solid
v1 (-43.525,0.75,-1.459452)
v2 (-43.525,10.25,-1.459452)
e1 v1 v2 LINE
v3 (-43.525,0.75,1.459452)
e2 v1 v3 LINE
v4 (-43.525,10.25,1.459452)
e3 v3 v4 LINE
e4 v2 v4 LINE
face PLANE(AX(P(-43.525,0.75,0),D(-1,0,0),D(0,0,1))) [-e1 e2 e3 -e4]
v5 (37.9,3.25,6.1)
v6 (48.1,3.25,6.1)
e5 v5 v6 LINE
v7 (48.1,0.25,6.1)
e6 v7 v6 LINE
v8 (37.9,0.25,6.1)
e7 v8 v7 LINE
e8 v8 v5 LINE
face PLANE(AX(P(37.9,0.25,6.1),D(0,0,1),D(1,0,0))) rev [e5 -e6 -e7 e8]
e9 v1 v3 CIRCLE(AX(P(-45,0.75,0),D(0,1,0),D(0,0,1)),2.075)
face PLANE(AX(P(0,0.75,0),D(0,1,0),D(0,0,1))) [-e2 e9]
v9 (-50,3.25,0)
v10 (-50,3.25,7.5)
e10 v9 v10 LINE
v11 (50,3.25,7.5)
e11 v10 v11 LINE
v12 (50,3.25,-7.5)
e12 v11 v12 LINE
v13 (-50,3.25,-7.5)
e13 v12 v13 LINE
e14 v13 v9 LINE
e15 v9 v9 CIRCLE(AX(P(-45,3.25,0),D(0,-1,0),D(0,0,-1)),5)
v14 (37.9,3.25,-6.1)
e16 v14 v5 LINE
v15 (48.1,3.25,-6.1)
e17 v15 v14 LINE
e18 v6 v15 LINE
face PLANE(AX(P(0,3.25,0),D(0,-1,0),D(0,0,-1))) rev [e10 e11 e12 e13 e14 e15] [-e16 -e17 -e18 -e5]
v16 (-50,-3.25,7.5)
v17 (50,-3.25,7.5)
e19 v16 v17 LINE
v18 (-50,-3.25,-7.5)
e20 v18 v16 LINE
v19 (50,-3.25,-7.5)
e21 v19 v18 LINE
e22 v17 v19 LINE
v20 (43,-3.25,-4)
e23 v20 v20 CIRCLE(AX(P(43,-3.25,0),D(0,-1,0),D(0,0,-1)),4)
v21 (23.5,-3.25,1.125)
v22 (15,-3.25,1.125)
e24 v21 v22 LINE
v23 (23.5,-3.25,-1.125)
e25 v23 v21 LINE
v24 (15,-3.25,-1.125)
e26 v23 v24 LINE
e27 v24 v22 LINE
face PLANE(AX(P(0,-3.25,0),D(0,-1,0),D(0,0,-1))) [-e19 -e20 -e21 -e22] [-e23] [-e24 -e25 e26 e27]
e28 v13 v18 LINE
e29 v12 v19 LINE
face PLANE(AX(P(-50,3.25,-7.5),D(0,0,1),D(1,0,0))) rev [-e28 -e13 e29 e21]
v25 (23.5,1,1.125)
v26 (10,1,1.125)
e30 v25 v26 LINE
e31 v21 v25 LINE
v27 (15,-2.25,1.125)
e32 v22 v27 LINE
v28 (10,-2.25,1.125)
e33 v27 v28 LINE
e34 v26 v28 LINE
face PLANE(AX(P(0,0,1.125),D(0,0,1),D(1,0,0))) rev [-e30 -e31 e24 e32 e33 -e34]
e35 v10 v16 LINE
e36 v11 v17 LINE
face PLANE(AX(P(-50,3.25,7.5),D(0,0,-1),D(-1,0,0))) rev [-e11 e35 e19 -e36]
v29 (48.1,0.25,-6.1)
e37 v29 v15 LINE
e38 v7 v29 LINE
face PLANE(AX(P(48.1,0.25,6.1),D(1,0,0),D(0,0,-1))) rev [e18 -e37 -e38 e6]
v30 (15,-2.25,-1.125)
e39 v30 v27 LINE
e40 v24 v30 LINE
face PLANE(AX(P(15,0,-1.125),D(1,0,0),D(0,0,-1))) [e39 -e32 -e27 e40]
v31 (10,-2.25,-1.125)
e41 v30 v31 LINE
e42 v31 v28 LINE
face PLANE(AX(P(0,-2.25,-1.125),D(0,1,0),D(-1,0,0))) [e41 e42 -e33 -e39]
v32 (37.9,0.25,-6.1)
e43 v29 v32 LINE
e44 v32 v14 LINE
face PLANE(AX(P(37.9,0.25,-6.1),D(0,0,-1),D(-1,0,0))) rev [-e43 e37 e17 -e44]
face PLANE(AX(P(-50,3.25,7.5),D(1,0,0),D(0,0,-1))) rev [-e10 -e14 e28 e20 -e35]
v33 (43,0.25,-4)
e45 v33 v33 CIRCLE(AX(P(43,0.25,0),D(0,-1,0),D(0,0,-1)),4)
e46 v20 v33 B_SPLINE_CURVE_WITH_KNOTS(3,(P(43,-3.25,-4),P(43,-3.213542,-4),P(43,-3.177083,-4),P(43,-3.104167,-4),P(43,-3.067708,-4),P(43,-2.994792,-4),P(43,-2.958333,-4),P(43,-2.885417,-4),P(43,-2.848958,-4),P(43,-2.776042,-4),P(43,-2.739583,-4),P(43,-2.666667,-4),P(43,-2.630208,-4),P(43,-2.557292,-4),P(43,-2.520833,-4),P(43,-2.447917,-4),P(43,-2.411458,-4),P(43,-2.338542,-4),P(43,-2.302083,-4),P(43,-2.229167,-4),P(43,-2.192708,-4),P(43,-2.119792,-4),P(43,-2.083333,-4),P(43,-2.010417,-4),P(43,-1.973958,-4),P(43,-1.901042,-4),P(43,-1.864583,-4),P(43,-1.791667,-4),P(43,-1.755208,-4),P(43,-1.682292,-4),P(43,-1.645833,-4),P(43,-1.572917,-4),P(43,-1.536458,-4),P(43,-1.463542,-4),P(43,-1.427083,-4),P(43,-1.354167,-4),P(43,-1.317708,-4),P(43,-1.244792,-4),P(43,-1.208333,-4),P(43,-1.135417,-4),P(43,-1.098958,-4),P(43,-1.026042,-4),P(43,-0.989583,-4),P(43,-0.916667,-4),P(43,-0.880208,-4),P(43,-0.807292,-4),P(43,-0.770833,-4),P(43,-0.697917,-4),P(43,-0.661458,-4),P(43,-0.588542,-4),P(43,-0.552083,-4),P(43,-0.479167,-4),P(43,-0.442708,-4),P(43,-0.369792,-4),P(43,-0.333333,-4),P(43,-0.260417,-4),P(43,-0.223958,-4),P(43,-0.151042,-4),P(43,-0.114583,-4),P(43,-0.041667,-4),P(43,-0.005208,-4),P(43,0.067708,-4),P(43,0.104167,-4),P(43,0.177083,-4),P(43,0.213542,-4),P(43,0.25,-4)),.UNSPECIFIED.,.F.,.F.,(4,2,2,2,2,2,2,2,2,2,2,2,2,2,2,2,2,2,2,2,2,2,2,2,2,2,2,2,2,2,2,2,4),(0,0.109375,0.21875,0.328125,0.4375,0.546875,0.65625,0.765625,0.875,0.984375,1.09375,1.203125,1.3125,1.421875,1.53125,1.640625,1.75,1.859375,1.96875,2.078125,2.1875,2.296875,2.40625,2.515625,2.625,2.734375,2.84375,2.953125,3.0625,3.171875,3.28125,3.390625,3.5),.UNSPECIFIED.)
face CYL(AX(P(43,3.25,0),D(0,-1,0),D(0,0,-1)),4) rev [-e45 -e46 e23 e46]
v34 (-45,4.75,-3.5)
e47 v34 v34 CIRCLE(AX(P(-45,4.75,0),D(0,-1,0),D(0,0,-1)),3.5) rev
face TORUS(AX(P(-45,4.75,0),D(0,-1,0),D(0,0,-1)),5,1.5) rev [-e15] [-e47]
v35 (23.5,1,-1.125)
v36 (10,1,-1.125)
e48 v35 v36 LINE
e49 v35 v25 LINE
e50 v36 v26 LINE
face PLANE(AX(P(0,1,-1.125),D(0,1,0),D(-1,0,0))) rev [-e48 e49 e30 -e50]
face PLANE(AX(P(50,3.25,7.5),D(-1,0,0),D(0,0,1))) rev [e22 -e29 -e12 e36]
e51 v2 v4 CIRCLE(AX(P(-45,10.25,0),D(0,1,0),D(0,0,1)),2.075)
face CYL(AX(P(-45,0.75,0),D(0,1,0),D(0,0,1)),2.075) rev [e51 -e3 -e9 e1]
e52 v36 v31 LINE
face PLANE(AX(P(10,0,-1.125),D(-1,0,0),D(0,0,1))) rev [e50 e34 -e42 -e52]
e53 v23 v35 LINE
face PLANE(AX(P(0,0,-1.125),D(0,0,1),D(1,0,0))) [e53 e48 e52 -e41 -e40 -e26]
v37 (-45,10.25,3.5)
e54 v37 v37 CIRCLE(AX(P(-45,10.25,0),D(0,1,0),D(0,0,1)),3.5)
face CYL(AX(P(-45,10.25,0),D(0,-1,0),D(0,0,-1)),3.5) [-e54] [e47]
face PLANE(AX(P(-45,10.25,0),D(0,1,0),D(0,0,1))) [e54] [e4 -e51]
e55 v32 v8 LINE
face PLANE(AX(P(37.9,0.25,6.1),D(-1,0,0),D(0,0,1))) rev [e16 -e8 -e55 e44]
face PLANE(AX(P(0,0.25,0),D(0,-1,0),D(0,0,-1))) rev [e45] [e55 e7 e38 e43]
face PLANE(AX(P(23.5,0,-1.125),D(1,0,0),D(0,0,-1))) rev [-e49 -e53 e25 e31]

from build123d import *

# Parameters (mm, degrees)
SKETCH2_W                = 100
SKETCH2_H                = 15
BOSS_EXTRUDE1_DEPTH      = 3.25
SKETCH15_W               = 8.5
SKETCH15_H               = 4.25
SKETCH15_W_2             = 5
SKETCH15_H_2             = 3.25
CUT_EXTRUDE8_DEPTH       = 1.125
SKETCH18_W               = 10.2
SKETCH18_H               = 12.2
CUT_EXTRUDE10_DEPTH      = 3
CUT_EXTRUDE11_DEPTH      = 51.975484304
CUT_EXTRUDE11_DEPTH_BACK = 51.975484304
SKETCH19_R               = 4
SKETCH20_R               = 3.5
BOSS_EXTRUDE2_DEPTH      = 7
CUT_EXTRUDE12_DEPTH      = 9.5
FILLET1_R                = 1.5


with BuildPart() as part:
    # Sketch2 → Boss-Extrude1 (new, symmetric)
    with BuildSketch(Plane(origin=(0, 0, 0), x_dir=(1, 0, 0), z_dir=(0, 1, 0))):
        Rectangle(SKETCH2_W, SKETCH2_H)
    extrude(amount=BOSS_EXTRUDE1_DEPTH, both=True)

    # Sketch15 → Cut-Extrude8 (cut, symmetric)
    with BuildSketch(Plane.XY):
        with Locations((19.25, -1.125)):
            Rectangle(SKETCH15_W, SKETCH15_H)
        with Locations((12.5, -0.625)):
            Rectangle(SKETCH15_W_2, SKETCH15_H_2)
    extrude(amount=CUT_EXTRUDE8_DEPTH, both=True, mode=Mode.SUBTRACT)

    # Sketch18 → Cut-Extrude10 (cut)
    with BuildSketch(Plane(origin=(0, 3.25, 0), x_dir=(1, 0, 0), z_dir=(0, 1, 0))):
        with Locations((43, 0)):
            Rectangle(SKETCH18_W, SKETCH18_H)
    extrude(amount=-CUT_EXTRUDE10_DEPTH, mode=Mode.SUBTRACT)

    # Sketch19 → Cut-Extrude11 (cut, two sides: drawn at the far end of the back side and taken through both)
    with BuildSketch(Plane.XZ.offset(3.25).offset(-CUT_EXTRUDE11_DEPTH_BACK)):
        with Locations(Location((43, 0, 0), (0, 0, 270))):
            Circle(SKETCH19_R)
    extrude(amount=CUT_EXTRUDE11_DEPTH + CUT_EXTRUDE11_DEPTH_BACK, mode=Mode.SUBTRACT)

    # Sketch20 → Boss-Extrude2 (add)
    with BuildSketch(Plane(origin=(0, 3.25, 0), x_dir=(1, 0, 0), z_dir=(0, 1, 0))):
        with Locations(Location((-45, 0, 0), (0, 0, 90))):
            Circle(SKETCH20_R)
    extrude(amount=BOSS_EXTRUDE2_DEPTH)

    # Sketch21 → Cut-Extrude12 (cut)
    with BuildSketch(Plane(origin=(0, 10.25, 0), x_dir=(1, 0, 0), z_dir=(0, 1, 0))):
        with BuildLine():
            Line((-43.525, -1.459451952), (-43.525, 1.459451952))
            ThreePointArc((-43.525, 1.459451952), (-47.075, 0), (-43.525, -1.459451952))
        make_face()
    extrude(amount=-CUT_EXTRUDE12_DEPTH, mode=Mode.SUBTRACT)

    # Fillet1
    fillet1_edges = [part.edges().sort_by_distance(p)[0] for p in [
        (-45, 3.25, 3.5),
    ]]
    fillet(fillet1_edges, radius=FILLET1_R - 0.0001)  # a hair under: the kernel refuses the full size


solid = part.part
